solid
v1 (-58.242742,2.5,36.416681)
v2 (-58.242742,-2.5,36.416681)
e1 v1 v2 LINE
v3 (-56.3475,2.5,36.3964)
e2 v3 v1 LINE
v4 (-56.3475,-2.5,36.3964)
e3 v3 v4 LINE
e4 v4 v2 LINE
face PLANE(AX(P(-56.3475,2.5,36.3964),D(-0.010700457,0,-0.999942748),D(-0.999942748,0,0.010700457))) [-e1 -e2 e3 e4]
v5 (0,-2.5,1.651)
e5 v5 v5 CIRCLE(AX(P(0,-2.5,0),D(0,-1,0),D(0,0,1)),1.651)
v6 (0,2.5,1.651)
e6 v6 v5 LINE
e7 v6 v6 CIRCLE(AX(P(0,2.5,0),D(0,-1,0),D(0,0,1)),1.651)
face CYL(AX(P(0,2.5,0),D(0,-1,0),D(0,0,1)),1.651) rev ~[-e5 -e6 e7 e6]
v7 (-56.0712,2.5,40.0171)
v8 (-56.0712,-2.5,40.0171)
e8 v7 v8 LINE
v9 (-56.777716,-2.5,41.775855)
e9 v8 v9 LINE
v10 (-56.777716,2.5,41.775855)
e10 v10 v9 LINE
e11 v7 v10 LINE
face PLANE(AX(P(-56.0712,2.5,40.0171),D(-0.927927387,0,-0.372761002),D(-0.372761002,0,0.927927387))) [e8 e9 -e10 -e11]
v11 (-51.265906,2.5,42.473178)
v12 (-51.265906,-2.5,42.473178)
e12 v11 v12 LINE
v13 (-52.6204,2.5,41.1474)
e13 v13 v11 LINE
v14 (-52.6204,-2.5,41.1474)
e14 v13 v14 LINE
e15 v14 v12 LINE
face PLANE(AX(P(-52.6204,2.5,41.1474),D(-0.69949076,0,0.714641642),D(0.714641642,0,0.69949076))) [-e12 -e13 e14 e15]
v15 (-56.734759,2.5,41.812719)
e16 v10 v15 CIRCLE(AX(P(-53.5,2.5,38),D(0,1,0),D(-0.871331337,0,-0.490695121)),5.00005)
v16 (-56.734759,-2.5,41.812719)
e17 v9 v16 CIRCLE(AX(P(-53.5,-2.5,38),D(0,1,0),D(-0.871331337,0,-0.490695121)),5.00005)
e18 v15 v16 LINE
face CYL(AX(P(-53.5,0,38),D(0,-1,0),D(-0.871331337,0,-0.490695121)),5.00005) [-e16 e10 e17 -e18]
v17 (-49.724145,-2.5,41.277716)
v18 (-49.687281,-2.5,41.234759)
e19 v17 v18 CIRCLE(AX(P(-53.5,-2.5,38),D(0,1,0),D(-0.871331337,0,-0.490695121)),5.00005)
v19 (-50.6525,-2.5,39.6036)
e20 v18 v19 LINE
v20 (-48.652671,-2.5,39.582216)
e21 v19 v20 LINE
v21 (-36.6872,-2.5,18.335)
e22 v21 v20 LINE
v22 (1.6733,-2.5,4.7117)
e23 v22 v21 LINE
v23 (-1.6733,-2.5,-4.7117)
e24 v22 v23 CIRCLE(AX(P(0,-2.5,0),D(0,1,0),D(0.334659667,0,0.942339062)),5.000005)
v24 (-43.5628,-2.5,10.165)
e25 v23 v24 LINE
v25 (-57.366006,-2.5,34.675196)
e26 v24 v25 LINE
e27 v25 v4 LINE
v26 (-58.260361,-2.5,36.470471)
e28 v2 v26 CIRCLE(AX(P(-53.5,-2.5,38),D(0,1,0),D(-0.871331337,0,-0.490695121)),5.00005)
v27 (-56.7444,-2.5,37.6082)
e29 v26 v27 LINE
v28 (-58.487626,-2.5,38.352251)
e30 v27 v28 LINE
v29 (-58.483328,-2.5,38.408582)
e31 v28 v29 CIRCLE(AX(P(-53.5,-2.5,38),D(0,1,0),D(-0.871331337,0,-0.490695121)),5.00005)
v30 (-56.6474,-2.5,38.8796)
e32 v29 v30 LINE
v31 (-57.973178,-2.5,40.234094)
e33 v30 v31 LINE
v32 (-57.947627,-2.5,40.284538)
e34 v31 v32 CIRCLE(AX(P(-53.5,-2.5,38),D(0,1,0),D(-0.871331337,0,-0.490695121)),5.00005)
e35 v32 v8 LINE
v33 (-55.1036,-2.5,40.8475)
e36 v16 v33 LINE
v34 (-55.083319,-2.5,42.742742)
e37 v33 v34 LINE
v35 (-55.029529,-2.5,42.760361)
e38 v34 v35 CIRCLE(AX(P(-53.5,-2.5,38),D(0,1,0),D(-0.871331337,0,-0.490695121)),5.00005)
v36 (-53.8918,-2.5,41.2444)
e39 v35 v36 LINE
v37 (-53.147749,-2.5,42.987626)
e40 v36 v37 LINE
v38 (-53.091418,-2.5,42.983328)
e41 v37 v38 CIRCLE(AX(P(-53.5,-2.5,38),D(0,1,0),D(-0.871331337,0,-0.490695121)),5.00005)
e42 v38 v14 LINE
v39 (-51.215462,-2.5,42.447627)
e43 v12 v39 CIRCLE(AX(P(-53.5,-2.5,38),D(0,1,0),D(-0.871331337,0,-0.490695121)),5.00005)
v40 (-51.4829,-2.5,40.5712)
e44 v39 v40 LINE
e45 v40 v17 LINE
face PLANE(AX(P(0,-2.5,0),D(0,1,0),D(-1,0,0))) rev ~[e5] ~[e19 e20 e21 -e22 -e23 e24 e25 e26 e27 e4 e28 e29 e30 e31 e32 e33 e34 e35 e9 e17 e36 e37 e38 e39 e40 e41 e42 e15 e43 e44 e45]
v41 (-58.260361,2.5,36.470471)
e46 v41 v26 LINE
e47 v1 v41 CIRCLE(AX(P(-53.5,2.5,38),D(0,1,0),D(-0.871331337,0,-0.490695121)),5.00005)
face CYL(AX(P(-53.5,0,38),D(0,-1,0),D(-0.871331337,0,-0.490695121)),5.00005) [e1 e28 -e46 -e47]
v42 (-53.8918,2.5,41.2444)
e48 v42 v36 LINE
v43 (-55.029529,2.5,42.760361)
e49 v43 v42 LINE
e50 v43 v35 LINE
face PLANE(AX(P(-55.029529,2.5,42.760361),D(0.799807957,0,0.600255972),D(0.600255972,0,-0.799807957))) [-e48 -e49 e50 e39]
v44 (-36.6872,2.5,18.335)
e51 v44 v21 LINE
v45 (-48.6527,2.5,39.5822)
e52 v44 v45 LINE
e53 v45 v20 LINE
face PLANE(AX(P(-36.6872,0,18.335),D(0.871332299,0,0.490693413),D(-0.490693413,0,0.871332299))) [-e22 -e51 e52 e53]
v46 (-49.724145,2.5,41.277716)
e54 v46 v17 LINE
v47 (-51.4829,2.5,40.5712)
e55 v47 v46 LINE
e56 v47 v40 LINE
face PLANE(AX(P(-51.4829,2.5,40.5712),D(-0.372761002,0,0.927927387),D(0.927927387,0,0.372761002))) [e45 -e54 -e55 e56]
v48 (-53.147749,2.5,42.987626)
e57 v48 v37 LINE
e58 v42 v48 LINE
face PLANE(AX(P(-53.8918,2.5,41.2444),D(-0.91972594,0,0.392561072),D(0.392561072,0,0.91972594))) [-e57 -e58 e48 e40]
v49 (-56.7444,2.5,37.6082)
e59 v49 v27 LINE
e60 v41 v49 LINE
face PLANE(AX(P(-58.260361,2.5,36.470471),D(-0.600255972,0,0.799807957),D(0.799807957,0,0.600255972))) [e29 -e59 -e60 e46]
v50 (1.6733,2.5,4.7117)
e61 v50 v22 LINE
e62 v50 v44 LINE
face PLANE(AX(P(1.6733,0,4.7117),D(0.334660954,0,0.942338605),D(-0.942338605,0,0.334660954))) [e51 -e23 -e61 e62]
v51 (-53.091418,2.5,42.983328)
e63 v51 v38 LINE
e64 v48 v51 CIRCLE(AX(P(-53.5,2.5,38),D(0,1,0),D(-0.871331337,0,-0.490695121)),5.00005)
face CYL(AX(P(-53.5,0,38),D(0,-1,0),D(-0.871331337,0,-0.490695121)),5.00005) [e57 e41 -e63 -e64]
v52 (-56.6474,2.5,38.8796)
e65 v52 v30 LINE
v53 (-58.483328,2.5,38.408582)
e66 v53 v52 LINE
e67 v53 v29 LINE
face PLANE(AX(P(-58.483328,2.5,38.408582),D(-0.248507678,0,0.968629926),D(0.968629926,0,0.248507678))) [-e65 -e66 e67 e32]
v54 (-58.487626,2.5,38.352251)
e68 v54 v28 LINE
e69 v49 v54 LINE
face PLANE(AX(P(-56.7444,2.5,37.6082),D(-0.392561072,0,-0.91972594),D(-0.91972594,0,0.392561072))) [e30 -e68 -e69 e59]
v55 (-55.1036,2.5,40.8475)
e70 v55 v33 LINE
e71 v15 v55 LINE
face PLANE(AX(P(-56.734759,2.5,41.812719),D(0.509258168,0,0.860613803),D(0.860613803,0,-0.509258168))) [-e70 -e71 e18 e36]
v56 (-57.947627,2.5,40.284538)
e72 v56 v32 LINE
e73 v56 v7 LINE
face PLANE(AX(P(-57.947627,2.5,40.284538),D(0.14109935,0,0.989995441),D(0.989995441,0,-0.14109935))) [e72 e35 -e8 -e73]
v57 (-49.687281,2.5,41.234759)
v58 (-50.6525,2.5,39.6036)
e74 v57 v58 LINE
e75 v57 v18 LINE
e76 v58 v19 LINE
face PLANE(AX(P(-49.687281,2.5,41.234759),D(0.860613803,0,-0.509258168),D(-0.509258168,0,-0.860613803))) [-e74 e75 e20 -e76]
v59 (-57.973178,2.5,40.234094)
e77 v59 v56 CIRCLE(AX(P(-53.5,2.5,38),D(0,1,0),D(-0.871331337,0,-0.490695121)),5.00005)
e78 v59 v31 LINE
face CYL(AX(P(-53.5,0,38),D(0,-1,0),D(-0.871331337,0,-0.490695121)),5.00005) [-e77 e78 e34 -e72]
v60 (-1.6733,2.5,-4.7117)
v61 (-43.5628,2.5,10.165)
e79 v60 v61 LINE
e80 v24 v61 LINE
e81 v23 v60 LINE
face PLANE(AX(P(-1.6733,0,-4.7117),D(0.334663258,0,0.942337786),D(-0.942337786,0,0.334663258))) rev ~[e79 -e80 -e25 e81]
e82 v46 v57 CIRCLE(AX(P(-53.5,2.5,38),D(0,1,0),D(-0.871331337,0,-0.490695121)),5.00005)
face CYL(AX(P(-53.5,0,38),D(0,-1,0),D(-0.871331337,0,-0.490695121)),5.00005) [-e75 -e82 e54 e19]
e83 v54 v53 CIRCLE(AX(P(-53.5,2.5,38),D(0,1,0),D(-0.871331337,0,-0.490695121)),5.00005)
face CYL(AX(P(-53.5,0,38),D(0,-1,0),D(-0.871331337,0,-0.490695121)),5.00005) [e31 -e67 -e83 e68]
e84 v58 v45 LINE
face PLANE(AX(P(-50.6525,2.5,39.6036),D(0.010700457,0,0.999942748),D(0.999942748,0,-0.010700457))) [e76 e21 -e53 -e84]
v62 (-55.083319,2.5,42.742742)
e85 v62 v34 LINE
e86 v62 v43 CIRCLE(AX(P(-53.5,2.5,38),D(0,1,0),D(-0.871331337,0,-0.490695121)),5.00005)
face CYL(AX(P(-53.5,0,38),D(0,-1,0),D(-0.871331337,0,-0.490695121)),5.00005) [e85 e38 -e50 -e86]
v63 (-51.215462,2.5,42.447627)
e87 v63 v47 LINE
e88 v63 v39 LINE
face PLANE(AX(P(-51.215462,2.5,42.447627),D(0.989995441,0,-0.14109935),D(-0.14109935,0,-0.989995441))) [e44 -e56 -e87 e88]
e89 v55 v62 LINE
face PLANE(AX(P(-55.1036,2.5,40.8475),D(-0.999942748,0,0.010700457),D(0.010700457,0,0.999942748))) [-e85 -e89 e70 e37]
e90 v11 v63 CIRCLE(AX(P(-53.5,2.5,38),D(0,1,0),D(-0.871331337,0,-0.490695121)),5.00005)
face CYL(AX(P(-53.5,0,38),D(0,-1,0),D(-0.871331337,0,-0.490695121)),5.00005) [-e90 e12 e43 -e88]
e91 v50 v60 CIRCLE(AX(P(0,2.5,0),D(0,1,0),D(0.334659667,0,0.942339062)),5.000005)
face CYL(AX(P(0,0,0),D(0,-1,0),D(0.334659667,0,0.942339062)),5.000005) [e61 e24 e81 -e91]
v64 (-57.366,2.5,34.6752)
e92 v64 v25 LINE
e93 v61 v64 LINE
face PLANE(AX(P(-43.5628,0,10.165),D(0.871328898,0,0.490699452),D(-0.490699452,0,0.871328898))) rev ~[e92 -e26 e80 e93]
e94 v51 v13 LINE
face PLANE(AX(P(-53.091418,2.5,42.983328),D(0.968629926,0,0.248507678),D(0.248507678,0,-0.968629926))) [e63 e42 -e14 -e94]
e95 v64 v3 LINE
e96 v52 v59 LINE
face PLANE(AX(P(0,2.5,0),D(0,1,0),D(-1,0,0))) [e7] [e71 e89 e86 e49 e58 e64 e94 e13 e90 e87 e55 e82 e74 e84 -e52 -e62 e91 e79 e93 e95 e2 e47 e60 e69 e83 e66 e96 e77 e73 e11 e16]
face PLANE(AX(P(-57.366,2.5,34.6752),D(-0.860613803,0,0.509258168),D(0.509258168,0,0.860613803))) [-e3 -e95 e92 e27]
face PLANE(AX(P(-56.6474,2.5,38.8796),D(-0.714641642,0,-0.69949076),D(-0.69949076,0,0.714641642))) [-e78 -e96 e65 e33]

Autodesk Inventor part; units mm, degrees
ref_plane "YZ Plane" through (0, 0, 0) normal (1, 0, 0) x (0, 1, 0)
ref_plane "XZ Plane" through (0, 0, 0) normal (0, 1, 0) x (-1, 0, 0)
ref_plane "XY Plane" through (0, 0, 0) normal (0, 0, 1) x (1, 0, 0)
sketch "Sketch1" plane through (0, 0, 0) normal (0, 1, 0) x (-1, 0, 0)
  line L0 (53.5, 38) -> (40.125, 14.25)
  line L1 (40.125, 14.25) -> (0, 0)
  line L2 (1.6733, -4.7117) -> (43.5628, 10.165)
  line L3 (43.5628, 10.165) -> (57.8567, 35.5465)
  line L4 (-1.6733, 4.7117) -> (36.6872, 18.335)
  line L5 (36.6872, 18.335) -> (49.1433, 40.4535)
  arc A0 (-1.6733, 4.7117) -> (1.6733, -4.7117) centre (0, 0) ccw
  arc A1 (57.8567, 35.5465) -> (49.1433, 40.4535) centre (53.5, 38) ccw
  dimension "d0" = 5
  dimension "d1" = 5
  dimension "d2" = 40.7078
  dimension "d3" = 5
  dimension "d4" = 25.3847
  dimension "d5" = 29.1297
  dimension "d6" = 53.5
extrude "Extrusion1" add sketch "Sketch1" along normal mid plane 5
sketch "Sketch2" plane through (0, 2.5, 0) normal (0, 1, 0) x (1, 0, 0)
  point P0 (0, 0)
  point P1 (0, 0)
hole "Hole1" at (0, 2.5, 0) direction (0, -1, 0) diameter 3.302 depth 12.3 tip angle 118 thread size "8-32 UNC" class "2B" standard "ANSI Unified Screw Threads"
sketch "Sketch3" plane through (0, 2.5, 0) normal (0, 1, 0) x (1, 0, 0)
  line L0 (-50.6525, -39.6036) -> (-48.6527, -39.5822)
  line L1 (-48.6527, -39.5822) -> (-49.634, -41.3248)
  line L2 (-49.634, -41.3248) -> (-50.6525, -39.6036)
  arc A0 (-57.8567, -35.5465) -> (-49.1433, -40.4535) centre (-53.5, -38) ccw projected
  line L3 (-49.1433, -40.4535) -> (-36.6872, -18.335) projected
  line L4 (-36.6872, -18.335) -> (-49.1433, -40.4535) projected
  line L5 (-49.1433, -40.4535) -> (-57.8567, -35.5465)
  line L6 (-51.4829, -40.5712) -> (-49.6271, -41.3167)
  line L7 (-49.6271, -41.3167) -> (-51.2007, -42.5512)
  line L8 (-51.2007, -42.5512) -> (-51.4829, -40.5712)
  line L9 (-52.6204, -41.1474) -> (-51.1912, -42.5463)
  line L10 (-51.1912, -42.5463) -> (-53.1174, -43.0846)
  line L11 (-53.1174, -43.0846) -> (-52.6204, -41.1474)
  line L12 (-53.8918, -41.2444) -> (-53.1067, -43.0838)
  line L13 (-53.1067, -43.0838) -> (-55.0923, -42.844)
  line L14 (-55.0923, -42.844) -> (-53.8918, -41.2444)
  line L15 (-55.1036, -40.8475) -> (-55.0822, -42.8473)
  line L16 (-55.0822, -42.8473) -> (-56.8248, -41.866)
  line L17 (-56.8248, -41.866) -> (-55.1036, -40.8475)
  line L18 (-56.0712, -40.0171) -> (-56.8167, -41.8729)
  line L19 (-56.8167, -41.8729) -> (-58.0512, -40.2993)
  line L20 (-58.0512, -40.2993) -> (-56.0712, -40.0171)
  line L21 (-56.6474, -38.8796) -> (-58.0463, -40.3088)
  line L22 (-58.0463, -40.3088) -> (-58.5846, -38.3826)
  line L23 (-58.5846, -38.3826) -> (-56.6474, -38.8796)
  line L24 (-56.7444, -37.6082) -> (-58.5838, -38.3933)
  line L25 (-58.5838, -38.3933) -> (-58.344, -36.4077)
  line L26 (-58.344, -36.4077) -> (-56.7444, -37.6082)
  line L27 (-56.3475, -36.3964) -> (-58.3473, -36.4178)
  line L28 (-58.3473, -36.4178) -> (-57.366, -34.6752)
  line L29 (-57.366, -34.6752) -> (-56.3475, -36.3964)
  point P0 (0, 0)
  point P1 (-49.6464, -40.1702)
  point P2 (-50.7702, -41.4797)
  point P3 (-52.3096, -42.2594)
  point P4 (-54.0303, -42.3907)
  point P5 (-55.6702, -41.8536)
  point P6 (-56.9797, -40.7298)
  point P7 (-57.7594, -39.1904)
  point P8 (-57.8907, -37.4697)
  point P9 (-57.3536, -35.8298)
  dimension "d16" = 2
  dimension "d19" = 180
extrude "Extrusion2" cut sketch "Sketch3" against normal through all contours L5 A0 L2 | L0 L1 L5 | A0 L1 L2 | L27 A0 L5 | L5 L28 L29 | L7 A0 L6 | A0 L8 L6 | A0 L27 L28 | L7 L8 A0 | L26 A0 L25 | L26 L24 A0 | L10 A0 L9 | A0 L24 L25 | A0 L11 L9 | L10 L11 A0 | L23 A0 L22 | L13 A0 L12 | L23 L21 A0 | A0 L21 L22 | A0 L14 L12 | L13 L14 A0 | L20 A0 L19 | L16 A0 L15 | L20 L18 A0 | A0 L18 L19 | A0 L17 L15 | L16 L17 A0
properties part number "Finger"
